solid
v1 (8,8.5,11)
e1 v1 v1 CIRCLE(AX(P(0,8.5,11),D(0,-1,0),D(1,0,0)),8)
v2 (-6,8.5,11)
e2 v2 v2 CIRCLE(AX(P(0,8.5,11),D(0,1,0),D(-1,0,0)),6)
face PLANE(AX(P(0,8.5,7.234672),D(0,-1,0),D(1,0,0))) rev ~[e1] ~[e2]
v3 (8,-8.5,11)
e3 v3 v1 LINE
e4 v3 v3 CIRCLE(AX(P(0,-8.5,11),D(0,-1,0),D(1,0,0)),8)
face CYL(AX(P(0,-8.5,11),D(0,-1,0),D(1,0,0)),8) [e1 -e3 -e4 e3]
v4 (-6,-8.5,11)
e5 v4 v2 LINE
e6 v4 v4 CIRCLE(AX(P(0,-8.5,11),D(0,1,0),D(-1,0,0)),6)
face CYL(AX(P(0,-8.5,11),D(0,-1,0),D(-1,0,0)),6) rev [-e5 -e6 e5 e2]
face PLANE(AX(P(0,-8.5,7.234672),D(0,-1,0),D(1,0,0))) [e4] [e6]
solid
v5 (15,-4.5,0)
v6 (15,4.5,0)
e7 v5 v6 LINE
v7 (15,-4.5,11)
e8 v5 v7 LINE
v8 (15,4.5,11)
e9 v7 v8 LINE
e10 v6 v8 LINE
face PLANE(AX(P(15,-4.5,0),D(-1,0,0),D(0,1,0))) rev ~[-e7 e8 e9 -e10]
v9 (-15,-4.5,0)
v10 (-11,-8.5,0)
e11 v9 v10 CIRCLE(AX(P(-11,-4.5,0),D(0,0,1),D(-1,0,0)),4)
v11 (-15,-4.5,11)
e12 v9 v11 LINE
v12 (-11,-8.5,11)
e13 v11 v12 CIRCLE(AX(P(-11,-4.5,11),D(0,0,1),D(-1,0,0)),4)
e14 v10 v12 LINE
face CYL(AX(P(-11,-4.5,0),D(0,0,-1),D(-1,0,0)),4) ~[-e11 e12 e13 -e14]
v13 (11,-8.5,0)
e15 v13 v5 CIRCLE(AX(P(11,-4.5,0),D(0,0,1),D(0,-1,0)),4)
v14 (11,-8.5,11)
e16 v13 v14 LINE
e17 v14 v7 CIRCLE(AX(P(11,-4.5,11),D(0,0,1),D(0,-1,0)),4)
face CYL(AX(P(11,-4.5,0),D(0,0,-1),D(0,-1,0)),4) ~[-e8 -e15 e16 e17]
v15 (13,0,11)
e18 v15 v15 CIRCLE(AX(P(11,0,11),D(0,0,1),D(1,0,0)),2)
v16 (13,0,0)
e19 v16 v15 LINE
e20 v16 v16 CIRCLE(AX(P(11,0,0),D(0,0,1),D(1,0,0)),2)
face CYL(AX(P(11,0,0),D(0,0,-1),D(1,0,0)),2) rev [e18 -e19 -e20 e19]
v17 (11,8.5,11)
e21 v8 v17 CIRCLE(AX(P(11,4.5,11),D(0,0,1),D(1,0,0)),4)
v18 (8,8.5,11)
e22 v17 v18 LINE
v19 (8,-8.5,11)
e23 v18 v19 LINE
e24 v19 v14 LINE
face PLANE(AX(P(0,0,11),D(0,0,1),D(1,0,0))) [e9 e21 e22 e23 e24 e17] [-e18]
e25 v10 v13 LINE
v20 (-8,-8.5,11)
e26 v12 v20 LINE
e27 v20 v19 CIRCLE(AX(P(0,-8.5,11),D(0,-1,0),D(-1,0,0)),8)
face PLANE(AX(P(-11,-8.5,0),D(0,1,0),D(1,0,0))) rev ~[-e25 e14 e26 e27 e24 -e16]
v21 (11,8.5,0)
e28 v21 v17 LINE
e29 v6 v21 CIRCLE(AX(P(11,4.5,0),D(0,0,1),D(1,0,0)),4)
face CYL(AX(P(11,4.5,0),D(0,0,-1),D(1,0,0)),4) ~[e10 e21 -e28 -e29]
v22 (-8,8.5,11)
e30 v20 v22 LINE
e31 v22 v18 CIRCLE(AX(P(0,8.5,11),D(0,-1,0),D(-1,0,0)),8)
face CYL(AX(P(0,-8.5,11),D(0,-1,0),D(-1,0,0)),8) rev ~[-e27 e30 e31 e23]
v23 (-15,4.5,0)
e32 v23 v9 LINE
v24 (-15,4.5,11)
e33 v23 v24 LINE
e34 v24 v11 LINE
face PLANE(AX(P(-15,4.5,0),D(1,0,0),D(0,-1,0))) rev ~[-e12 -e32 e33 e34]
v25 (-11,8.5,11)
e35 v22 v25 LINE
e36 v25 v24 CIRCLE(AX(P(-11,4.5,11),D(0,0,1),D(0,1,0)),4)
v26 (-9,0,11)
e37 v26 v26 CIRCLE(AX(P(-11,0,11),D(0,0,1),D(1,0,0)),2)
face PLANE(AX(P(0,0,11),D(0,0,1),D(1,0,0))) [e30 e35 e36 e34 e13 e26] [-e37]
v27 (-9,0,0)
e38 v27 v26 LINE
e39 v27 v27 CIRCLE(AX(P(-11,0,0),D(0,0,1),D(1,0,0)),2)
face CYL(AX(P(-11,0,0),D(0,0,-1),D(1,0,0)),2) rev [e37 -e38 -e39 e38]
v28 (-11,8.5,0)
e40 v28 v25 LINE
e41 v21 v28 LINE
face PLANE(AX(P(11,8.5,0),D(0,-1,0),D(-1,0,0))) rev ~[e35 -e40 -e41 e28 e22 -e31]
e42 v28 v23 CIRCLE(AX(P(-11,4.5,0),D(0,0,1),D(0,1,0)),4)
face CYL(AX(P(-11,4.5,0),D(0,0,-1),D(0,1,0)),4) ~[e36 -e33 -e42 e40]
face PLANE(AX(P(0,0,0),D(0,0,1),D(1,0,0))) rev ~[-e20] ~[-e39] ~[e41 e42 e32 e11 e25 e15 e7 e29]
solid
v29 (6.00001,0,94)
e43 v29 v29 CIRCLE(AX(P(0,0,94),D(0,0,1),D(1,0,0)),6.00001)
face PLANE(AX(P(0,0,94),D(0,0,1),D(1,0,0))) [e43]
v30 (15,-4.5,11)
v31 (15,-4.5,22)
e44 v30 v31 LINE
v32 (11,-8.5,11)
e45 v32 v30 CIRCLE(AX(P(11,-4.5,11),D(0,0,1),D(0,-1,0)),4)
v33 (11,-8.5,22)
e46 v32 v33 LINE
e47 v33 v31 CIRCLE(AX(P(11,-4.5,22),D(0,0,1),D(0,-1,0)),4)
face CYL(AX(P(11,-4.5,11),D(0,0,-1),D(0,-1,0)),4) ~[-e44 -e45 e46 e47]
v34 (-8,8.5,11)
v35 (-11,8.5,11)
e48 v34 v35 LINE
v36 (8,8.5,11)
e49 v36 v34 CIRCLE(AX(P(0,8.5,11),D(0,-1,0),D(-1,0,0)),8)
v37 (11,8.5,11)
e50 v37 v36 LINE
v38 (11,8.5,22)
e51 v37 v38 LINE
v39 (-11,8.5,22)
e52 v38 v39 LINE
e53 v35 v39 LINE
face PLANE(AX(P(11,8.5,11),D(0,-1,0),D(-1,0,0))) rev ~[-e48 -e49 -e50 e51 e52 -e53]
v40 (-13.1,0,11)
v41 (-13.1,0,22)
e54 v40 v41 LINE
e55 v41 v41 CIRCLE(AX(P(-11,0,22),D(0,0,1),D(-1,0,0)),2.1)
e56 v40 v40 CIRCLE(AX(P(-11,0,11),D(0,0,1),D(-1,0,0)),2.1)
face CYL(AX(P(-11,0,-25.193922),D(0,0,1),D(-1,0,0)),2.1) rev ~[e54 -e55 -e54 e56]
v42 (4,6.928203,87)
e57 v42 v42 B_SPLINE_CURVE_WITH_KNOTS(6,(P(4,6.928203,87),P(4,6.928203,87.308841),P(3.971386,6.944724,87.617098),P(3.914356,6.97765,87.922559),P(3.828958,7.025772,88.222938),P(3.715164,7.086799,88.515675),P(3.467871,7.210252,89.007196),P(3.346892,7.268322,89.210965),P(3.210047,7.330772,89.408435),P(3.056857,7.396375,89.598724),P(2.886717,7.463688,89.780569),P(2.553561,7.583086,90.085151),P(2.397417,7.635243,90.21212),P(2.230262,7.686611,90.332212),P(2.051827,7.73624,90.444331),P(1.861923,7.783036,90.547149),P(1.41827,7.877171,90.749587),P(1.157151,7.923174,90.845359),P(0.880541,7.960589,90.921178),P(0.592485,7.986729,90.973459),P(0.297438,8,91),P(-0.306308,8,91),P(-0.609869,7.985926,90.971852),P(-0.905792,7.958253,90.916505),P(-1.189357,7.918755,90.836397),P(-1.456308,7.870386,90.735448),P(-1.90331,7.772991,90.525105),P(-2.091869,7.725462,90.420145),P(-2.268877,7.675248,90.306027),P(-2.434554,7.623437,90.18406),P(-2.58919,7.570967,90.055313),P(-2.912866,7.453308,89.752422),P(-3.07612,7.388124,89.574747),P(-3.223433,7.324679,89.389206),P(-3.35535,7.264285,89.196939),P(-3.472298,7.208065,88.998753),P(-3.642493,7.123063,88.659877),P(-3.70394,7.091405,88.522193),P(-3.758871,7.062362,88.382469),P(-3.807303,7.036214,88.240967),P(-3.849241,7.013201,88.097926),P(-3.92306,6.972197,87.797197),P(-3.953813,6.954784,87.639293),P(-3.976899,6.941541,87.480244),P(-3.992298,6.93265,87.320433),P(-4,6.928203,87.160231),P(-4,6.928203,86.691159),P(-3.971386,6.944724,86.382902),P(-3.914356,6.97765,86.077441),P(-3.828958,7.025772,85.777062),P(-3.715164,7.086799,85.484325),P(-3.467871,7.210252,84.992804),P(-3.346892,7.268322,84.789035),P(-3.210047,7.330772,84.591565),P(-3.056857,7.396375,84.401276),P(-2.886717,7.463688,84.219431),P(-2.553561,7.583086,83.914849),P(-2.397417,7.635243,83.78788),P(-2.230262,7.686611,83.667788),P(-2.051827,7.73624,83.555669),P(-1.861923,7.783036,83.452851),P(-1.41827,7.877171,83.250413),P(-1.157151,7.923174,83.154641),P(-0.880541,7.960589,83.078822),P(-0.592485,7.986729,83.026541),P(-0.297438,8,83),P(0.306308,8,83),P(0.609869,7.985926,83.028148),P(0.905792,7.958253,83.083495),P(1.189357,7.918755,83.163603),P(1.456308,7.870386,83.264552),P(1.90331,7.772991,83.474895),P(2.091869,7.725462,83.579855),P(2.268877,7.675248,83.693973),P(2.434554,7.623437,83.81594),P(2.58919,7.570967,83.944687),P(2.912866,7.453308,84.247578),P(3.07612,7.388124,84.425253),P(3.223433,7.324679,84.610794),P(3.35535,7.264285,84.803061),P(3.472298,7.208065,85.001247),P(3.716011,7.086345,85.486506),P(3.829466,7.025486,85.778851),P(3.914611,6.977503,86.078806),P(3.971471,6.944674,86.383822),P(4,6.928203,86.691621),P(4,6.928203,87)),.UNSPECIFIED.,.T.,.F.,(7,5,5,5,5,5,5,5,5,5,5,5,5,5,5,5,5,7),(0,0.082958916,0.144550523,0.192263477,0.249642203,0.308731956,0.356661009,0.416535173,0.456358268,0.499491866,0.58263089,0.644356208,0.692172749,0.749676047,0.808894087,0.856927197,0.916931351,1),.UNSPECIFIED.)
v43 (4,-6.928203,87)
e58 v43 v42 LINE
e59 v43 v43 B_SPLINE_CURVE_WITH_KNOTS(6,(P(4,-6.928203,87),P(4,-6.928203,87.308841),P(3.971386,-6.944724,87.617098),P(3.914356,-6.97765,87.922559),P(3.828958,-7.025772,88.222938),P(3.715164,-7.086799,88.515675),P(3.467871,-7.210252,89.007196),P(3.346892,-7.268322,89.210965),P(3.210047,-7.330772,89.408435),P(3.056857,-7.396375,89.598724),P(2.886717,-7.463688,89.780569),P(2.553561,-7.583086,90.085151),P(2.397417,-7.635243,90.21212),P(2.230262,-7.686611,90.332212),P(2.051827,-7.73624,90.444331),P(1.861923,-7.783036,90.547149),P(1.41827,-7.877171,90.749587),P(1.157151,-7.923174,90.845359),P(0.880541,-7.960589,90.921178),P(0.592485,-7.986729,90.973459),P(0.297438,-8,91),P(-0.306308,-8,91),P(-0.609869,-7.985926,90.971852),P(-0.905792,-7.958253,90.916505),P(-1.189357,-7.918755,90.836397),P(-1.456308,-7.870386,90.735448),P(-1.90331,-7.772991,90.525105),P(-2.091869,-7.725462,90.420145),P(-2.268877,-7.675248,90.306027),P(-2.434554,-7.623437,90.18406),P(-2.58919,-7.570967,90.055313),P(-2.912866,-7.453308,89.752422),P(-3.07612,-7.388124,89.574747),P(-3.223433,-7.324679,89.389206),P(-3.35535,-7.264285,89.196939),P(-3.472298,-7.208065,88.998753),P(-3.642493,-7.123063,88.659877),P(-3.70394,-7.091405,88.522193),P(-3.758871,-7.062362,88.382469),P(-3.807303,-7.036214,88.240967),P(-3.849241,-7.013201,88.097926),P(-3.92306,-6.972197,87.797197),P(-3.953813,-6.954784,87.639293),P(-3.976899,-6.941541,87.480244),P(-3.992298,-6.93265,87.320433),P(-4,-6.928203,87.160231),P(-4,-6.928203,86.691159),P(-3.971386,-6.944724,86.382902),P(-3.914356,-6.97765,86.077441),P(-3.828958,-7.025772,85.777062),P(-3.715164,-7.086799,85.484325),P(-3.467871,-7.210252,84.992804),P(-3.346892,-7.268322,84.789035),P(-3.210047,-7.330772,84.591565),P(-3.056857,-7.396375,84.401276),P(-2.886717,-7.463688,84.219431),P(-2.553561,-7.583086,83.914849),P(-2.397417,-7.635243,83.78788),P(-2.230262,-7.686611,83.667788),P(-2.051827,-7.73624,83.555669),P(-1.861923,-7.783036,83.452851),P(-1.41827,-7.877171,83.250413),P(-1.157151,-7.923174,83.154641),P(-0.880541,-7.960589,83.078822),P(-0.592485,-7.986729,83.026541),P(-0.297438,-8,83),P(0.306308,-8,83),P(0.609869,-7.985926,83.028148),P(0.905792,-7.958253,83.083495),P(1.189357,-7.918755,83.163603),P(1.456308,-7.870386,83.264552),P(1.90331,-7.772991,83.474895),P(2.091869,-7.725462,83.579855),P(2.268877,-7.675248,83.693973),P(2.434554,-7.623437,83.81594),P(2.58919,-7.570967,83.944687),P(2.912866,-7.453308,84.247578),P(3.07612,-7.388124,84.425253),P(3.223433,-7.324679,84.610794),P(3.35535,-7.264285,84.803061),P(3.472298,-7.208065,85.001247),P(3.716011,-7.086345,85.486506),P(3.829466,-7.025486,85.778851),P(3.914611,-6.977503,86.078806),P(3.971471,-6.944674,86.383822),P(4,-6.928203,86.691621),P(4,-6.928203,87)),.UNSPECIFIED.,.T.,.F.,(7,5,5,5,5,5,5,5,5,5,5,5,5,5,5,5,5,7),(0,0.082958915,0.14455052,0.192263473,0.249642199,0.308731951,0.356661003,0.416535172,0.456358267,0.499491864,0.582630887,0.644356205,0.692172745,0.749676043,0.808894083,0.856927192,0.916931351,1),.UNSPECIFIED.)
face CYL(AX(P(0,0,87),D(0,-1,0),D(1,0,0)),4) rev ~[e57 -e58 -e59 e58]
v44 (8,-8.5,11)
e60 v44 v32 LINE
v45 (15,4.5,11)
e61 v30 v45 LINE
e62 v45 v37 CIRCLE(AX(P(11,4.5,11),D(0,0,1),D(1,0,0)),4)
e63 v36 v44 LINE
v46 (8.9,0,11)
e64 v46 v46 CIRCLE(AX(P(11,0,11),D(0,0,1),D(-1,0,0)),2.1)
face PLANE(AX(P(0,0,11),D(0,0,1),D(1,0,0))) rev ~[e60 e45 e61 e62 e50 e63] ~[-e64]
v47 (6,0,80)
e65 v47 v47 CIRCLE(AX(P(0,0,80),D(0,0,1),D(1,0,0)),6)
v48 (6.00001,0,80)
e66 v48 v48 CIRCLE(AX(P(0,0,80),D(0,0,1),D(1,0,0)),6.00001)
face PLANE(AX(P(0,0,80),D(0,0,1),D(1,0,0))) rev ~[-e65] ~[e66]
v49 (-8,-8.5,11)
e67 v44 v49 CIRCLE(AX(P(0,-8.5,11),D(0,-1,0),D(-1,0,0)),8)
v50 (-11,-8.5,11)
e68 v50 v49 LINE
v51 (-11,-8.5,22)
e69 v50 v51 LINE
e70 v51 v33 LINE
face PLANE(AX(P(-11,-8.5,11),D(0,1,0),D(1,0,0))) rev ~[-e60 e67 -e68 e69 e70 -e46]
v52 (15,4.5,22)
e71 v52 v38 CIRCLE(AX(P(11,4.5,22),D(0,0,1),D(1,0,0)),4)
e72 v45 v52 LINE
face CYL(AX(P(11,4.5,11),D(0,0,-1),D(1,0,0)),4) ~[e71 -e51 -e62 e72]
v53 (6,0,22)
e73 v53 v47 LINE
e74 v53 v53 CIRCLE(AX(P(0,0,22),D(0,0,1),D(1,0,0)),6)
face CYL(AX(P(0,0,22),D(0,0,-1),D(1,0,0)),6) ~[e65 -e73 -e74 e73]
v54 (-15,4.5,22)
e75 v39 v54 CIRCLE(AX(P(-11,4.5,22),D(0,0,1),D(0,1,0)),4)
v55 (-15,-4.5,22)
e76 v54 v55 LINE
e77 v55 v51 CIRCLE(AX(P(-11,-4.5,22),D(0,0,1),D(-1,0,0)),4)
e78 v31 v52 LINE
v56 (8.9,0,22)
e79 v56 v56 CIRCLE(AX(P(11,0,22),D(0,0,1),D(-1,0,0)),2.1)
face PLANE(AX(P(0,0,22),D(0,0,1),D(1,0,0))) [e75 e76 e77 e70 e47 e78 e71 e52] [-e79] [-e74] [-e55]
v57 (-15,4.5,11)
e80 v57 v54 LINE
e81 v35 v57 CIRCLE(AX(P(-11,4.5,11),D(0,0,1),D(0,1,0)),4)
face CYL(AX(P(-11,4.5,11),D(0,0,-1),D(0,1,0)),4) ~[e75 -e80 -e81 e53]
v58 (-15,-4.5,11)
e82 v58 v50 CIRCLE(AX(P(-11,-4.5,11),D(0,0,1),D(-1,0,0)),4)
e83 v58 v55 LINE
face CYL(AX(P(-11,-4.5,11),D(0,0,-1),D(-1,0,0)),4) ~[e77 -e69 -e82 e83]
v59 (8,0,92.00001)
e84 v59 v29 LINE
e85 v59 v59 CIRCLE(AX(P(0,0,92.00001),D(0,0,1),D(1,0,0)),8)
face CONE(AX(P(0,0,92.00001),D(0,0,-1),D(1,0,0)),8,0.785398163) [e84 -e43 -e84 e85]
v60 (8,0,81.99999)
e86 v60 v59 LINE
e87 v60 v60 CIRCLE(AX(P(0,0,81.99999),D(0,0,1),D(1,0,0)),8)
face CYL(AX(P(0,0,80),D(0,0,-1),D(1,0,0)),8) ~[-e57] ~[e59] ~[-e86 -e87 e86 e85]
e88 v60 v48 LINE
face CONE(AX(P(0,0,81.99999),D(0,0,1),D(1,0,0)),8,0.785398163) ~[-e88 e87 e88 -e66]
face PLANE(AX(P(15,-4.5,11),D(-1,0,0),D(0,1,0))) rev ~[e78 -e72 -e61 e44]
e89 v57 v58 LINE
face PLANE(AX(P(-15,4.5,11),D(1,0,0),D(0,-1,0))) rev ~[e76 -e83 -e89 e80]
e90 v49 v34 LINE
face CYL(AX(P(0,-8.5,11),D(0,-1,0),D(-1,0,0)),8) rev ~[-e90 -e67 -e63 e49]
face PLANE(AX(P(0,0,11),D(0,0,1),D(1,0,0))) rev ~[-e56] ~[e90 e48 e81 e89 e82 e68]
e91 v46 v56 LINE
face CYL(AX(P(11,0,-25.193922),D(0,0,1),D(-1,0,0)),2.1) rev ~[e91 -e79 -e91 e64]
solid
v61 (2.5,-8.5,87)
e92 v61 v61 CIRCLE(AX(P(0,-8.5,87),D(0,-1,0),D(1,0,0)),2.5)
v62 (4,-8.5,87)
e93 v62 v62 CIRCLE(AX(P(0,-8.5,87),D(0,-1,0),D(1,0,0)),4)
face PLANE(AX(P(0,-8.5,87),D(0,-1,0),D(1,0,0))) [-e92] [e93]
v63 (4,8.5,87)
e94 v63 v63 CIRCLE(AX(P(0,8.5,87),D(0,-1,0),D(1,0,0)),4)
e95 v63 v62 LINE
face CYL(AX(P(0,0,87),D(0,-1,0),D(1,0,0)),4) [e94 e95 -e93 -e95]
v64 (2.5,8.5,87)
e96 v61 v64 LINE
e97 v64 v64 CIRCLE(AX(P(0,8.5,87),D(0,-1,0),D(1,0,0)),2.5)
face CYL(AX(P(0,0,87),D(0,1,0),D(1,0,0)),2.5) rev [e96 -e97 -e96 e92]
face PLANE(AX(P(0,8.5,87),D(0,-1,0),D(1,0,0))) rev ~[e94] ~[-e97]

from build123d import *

# Parameters (mm, degrees)
F0_R           = 2
F1_DEPTH       = 11
F2_R           = 2
F3_DEPTH       = 11
F4_D           = 4.2
F5_R           = 6
F6_DEPTH       = 58
F7_R           = 8
F7_R_2         = 6
F8_DEPTH       = 14
F9_SIZE        = 1.99999
F11_DEPTH      = 17.001
F12_DEPTH      = 17
F13_R          = 4
F13_R_2        = 2.5
F14_DEPTH      = 8.501
F14_DEPTH_BACK = 8.501
F15_DEPTH      = 8.5


# Not quite as in the source:
# - a fillet or chamfer is up to 0.001 mm smaller than in the source, because OpenCascade refuses the exact size


with BuildPart() as f1:
    # F0 (on Top) → F1 (new body)
    with BuildSketch(Plane.XY):
        with BuildLine():
            Line((-11, -8.5), (11, -8.5))
            ThreePointArc((11, -8.5), (13.8284271247, -7.3284271247), (15, -4.5))
            Line((15, -4.5), (15, 4.5))
            ThreePointArc((15, 4.5), (13.8284271247, 7.3284271247), (11, 8.5))
            Line((11, 8.5), (-11, 8.5))
            ThreePointArc((-11, 8.5), (-13.8284271247, 7.3284271247), (-15, 4.5))
            Line((-15, 4.5), (-15, -4.5))
            ThreePointArc((-15, -4.5), (-13.8284271247, -7.3284271247), (-11, -8.5))
        make_face()
        with Locations((-11, 0)):
            Circle(F0_R, mode=Mode.SUBTRACT)
        with Locations((11, 0)):
            Circle(F0_R, mode=Mode.SUBTRACT)
    extrude(amount=F1_DEPTH)


with BuildPart() as f3:
    # F2 (on face) → F3 (new body)
    with BuildSketch(Plane.XY.offset(11)):
        with BuildLine():
            ThreePointArc((-15, -4.5), (-13.8284271247, -7.3284271247), (-11, -8.5))
            Line((-11, -8.5), (11, -8.5))
            ThreePointArc((11, -8.5), (13.8284271247, -7.3284271247), (15, -4.5))
            Line((15, -4.5), (15, 4.5))
            ThreePointArc((15, 4.5), (13.8284271247, 7.3284271247), (11, 8.5))
            Line((11, 8.5), (-11, 8.5))
            ThreePointArc((-11, 8.5), (-13.8284271247, 7.3284271247), (-15, 4.5))
            Line((-15, 4.5), (-15, -4.5))
        make_face()
        with Locations((-11, 0)):
            Circle(F2_R, mode=Mode.SUBTRACT)
        with Locations((11, 0)):
            Circle(F2_R, mode=Mode.SUBTRACT)
        with Locations((-11, 0)):
            Circle(F2_R)
        with Locations((11, 0)):
            Circle(F2_R)
    extrude(amount=F3_DEPTH)

    # F4 (through all)
    with Locations(Plane(origin=(0, 0, 11), x_dir=(1, 0, 0), z_dir=(0, 0, -1))):
        with Locations((-11, 0), (11, 0)):
            Hole(F4_D / 2)

    # F5 (on face) → F6 (join)
    with BuildSketch(Plane.XY.offset(22)):
        Circle(F5_R)
    extrude(amount=F6_DEPTH)

    # F7 (on face) → F8 (join)
    with BuildSketch(Plane.XY.offset(80)):
        Circle(F7_R)
        Circle(F7_R_2, mode=Mode.SUBTRACT)
        Circle(F7_R_2)
    extrude(amount=F8_DEPTH)

    # F9 (size 2 in the source; OpenCascade refuses exactly that, so slightly less here)
    f9_edges = [f3.edges().sort_by_distance(p)[0] for p in [
        (-8, 0, 80),
        (-8, 0, 94),
    ]]
    chamfer(f9_edges, length=F9_SIZE)


with BuildPart() as f11_tool:
    # F10 (on face) → F11 (new body, through all)
    with BuildSketch(Plane.XZ.offset(8.5)):
        with BuildLine():
            Line((-6, 11), (6, 11))
            ThreePointArc((6, 11), (0, 17), (-6, 11))
        make_face()
        with BuildLine():
            ThreePointArc((-6, 11), (0, 17), (6, 11))
            Line((6, 11), (8, 11))
            ThreePointArc((8, 11), (0, 19), (-8, 11))
            Line((-8, 11), (-6, 11))
        make_face()
        with BuildLine():
            Line((8, 11), (6, 11))
            ThreePointArc((6, 11), (0, 5), (-6, 11))
            Line((-6, 11), (-8, 11))
            ThreePointArc((-8, 11), (0, 3), (8, 11))
        make_face()
        with BuildLine():
            ThreePointArc((-6, 11), (0, 5), (6, 11))
            Line((6, 11), (-6, 11))
        make_face()
    extrude(amount=-F11_DEPTH)


with BuildPart() as f1_1:
    add(f1.part)

    # F11: cut by f11_tool
    add(f11_tool.part, mode=Mode.SUBTRACT)


with BuildPart() as f3_1:
    add(f3.part)

    # F11: cut by f11_tool
    add(f11_tool.part, mode=Mode.SUBTRACT)

    # F13 (on Front) → F14 (cut, two sides)
    with BuildSketch(Plane.XZ) as f14_sk:
        with Locations((0, 87)):
            Circle(F13_R)
        with Locations((0, 87)):
            Circle(F13_R_2, mode=Mode.SUBTRACT)
        with Locations((0, 87)):
            Circle(F13_R_2)
    extrude(amount=-F14_DEPTH, mode=Mode.SUBTRACT)
    extrude(f14_sk.sketch, amount=F14_DEPTH_BACK, mode=Mode.SUBTRACT)


with BuildPart() as f12:
    # F10 (on face) → F12 (new body)
    with BuildSketch(Plane.XZ.offset(8.5)):
        with BuildLine():
            Line((8, 11), (6, 11))
            ThreePointArc((6, 11), (0, 5), (-6, 11))
            Line((-6, 11), (-8, 11))
            ThreePointArc((-8, 11), (0, 3), (8, 11))
        make_face()
        with BuildLine():
            ThreePointArc((-6, 11), (0, 17), (6, 11))
            Line((6, 11), (8, 11))
            ThreePointArc((8, 11), (0, 19), (-8, 11))
            Line((-8, 11), (-6, 11))
        make_face()
    extrude(amount=-F12_DEPTH)


with BuildPart() as f15:
    # F13 (on Front) → F15 (new body, symmetric)
    with BuildSketch(Plane.XZ):
        with Locations((0, 87)):
            Circle(F13_R)
        with Locations((0, 87)):
            Circle(F13_R_2, mode=Mode.SUBTRACT)
    extrude(amount=F15_DEPTH, both=True)


solid = Compound([f1_1.part, f3_1.part, f12.part, f15.part])
